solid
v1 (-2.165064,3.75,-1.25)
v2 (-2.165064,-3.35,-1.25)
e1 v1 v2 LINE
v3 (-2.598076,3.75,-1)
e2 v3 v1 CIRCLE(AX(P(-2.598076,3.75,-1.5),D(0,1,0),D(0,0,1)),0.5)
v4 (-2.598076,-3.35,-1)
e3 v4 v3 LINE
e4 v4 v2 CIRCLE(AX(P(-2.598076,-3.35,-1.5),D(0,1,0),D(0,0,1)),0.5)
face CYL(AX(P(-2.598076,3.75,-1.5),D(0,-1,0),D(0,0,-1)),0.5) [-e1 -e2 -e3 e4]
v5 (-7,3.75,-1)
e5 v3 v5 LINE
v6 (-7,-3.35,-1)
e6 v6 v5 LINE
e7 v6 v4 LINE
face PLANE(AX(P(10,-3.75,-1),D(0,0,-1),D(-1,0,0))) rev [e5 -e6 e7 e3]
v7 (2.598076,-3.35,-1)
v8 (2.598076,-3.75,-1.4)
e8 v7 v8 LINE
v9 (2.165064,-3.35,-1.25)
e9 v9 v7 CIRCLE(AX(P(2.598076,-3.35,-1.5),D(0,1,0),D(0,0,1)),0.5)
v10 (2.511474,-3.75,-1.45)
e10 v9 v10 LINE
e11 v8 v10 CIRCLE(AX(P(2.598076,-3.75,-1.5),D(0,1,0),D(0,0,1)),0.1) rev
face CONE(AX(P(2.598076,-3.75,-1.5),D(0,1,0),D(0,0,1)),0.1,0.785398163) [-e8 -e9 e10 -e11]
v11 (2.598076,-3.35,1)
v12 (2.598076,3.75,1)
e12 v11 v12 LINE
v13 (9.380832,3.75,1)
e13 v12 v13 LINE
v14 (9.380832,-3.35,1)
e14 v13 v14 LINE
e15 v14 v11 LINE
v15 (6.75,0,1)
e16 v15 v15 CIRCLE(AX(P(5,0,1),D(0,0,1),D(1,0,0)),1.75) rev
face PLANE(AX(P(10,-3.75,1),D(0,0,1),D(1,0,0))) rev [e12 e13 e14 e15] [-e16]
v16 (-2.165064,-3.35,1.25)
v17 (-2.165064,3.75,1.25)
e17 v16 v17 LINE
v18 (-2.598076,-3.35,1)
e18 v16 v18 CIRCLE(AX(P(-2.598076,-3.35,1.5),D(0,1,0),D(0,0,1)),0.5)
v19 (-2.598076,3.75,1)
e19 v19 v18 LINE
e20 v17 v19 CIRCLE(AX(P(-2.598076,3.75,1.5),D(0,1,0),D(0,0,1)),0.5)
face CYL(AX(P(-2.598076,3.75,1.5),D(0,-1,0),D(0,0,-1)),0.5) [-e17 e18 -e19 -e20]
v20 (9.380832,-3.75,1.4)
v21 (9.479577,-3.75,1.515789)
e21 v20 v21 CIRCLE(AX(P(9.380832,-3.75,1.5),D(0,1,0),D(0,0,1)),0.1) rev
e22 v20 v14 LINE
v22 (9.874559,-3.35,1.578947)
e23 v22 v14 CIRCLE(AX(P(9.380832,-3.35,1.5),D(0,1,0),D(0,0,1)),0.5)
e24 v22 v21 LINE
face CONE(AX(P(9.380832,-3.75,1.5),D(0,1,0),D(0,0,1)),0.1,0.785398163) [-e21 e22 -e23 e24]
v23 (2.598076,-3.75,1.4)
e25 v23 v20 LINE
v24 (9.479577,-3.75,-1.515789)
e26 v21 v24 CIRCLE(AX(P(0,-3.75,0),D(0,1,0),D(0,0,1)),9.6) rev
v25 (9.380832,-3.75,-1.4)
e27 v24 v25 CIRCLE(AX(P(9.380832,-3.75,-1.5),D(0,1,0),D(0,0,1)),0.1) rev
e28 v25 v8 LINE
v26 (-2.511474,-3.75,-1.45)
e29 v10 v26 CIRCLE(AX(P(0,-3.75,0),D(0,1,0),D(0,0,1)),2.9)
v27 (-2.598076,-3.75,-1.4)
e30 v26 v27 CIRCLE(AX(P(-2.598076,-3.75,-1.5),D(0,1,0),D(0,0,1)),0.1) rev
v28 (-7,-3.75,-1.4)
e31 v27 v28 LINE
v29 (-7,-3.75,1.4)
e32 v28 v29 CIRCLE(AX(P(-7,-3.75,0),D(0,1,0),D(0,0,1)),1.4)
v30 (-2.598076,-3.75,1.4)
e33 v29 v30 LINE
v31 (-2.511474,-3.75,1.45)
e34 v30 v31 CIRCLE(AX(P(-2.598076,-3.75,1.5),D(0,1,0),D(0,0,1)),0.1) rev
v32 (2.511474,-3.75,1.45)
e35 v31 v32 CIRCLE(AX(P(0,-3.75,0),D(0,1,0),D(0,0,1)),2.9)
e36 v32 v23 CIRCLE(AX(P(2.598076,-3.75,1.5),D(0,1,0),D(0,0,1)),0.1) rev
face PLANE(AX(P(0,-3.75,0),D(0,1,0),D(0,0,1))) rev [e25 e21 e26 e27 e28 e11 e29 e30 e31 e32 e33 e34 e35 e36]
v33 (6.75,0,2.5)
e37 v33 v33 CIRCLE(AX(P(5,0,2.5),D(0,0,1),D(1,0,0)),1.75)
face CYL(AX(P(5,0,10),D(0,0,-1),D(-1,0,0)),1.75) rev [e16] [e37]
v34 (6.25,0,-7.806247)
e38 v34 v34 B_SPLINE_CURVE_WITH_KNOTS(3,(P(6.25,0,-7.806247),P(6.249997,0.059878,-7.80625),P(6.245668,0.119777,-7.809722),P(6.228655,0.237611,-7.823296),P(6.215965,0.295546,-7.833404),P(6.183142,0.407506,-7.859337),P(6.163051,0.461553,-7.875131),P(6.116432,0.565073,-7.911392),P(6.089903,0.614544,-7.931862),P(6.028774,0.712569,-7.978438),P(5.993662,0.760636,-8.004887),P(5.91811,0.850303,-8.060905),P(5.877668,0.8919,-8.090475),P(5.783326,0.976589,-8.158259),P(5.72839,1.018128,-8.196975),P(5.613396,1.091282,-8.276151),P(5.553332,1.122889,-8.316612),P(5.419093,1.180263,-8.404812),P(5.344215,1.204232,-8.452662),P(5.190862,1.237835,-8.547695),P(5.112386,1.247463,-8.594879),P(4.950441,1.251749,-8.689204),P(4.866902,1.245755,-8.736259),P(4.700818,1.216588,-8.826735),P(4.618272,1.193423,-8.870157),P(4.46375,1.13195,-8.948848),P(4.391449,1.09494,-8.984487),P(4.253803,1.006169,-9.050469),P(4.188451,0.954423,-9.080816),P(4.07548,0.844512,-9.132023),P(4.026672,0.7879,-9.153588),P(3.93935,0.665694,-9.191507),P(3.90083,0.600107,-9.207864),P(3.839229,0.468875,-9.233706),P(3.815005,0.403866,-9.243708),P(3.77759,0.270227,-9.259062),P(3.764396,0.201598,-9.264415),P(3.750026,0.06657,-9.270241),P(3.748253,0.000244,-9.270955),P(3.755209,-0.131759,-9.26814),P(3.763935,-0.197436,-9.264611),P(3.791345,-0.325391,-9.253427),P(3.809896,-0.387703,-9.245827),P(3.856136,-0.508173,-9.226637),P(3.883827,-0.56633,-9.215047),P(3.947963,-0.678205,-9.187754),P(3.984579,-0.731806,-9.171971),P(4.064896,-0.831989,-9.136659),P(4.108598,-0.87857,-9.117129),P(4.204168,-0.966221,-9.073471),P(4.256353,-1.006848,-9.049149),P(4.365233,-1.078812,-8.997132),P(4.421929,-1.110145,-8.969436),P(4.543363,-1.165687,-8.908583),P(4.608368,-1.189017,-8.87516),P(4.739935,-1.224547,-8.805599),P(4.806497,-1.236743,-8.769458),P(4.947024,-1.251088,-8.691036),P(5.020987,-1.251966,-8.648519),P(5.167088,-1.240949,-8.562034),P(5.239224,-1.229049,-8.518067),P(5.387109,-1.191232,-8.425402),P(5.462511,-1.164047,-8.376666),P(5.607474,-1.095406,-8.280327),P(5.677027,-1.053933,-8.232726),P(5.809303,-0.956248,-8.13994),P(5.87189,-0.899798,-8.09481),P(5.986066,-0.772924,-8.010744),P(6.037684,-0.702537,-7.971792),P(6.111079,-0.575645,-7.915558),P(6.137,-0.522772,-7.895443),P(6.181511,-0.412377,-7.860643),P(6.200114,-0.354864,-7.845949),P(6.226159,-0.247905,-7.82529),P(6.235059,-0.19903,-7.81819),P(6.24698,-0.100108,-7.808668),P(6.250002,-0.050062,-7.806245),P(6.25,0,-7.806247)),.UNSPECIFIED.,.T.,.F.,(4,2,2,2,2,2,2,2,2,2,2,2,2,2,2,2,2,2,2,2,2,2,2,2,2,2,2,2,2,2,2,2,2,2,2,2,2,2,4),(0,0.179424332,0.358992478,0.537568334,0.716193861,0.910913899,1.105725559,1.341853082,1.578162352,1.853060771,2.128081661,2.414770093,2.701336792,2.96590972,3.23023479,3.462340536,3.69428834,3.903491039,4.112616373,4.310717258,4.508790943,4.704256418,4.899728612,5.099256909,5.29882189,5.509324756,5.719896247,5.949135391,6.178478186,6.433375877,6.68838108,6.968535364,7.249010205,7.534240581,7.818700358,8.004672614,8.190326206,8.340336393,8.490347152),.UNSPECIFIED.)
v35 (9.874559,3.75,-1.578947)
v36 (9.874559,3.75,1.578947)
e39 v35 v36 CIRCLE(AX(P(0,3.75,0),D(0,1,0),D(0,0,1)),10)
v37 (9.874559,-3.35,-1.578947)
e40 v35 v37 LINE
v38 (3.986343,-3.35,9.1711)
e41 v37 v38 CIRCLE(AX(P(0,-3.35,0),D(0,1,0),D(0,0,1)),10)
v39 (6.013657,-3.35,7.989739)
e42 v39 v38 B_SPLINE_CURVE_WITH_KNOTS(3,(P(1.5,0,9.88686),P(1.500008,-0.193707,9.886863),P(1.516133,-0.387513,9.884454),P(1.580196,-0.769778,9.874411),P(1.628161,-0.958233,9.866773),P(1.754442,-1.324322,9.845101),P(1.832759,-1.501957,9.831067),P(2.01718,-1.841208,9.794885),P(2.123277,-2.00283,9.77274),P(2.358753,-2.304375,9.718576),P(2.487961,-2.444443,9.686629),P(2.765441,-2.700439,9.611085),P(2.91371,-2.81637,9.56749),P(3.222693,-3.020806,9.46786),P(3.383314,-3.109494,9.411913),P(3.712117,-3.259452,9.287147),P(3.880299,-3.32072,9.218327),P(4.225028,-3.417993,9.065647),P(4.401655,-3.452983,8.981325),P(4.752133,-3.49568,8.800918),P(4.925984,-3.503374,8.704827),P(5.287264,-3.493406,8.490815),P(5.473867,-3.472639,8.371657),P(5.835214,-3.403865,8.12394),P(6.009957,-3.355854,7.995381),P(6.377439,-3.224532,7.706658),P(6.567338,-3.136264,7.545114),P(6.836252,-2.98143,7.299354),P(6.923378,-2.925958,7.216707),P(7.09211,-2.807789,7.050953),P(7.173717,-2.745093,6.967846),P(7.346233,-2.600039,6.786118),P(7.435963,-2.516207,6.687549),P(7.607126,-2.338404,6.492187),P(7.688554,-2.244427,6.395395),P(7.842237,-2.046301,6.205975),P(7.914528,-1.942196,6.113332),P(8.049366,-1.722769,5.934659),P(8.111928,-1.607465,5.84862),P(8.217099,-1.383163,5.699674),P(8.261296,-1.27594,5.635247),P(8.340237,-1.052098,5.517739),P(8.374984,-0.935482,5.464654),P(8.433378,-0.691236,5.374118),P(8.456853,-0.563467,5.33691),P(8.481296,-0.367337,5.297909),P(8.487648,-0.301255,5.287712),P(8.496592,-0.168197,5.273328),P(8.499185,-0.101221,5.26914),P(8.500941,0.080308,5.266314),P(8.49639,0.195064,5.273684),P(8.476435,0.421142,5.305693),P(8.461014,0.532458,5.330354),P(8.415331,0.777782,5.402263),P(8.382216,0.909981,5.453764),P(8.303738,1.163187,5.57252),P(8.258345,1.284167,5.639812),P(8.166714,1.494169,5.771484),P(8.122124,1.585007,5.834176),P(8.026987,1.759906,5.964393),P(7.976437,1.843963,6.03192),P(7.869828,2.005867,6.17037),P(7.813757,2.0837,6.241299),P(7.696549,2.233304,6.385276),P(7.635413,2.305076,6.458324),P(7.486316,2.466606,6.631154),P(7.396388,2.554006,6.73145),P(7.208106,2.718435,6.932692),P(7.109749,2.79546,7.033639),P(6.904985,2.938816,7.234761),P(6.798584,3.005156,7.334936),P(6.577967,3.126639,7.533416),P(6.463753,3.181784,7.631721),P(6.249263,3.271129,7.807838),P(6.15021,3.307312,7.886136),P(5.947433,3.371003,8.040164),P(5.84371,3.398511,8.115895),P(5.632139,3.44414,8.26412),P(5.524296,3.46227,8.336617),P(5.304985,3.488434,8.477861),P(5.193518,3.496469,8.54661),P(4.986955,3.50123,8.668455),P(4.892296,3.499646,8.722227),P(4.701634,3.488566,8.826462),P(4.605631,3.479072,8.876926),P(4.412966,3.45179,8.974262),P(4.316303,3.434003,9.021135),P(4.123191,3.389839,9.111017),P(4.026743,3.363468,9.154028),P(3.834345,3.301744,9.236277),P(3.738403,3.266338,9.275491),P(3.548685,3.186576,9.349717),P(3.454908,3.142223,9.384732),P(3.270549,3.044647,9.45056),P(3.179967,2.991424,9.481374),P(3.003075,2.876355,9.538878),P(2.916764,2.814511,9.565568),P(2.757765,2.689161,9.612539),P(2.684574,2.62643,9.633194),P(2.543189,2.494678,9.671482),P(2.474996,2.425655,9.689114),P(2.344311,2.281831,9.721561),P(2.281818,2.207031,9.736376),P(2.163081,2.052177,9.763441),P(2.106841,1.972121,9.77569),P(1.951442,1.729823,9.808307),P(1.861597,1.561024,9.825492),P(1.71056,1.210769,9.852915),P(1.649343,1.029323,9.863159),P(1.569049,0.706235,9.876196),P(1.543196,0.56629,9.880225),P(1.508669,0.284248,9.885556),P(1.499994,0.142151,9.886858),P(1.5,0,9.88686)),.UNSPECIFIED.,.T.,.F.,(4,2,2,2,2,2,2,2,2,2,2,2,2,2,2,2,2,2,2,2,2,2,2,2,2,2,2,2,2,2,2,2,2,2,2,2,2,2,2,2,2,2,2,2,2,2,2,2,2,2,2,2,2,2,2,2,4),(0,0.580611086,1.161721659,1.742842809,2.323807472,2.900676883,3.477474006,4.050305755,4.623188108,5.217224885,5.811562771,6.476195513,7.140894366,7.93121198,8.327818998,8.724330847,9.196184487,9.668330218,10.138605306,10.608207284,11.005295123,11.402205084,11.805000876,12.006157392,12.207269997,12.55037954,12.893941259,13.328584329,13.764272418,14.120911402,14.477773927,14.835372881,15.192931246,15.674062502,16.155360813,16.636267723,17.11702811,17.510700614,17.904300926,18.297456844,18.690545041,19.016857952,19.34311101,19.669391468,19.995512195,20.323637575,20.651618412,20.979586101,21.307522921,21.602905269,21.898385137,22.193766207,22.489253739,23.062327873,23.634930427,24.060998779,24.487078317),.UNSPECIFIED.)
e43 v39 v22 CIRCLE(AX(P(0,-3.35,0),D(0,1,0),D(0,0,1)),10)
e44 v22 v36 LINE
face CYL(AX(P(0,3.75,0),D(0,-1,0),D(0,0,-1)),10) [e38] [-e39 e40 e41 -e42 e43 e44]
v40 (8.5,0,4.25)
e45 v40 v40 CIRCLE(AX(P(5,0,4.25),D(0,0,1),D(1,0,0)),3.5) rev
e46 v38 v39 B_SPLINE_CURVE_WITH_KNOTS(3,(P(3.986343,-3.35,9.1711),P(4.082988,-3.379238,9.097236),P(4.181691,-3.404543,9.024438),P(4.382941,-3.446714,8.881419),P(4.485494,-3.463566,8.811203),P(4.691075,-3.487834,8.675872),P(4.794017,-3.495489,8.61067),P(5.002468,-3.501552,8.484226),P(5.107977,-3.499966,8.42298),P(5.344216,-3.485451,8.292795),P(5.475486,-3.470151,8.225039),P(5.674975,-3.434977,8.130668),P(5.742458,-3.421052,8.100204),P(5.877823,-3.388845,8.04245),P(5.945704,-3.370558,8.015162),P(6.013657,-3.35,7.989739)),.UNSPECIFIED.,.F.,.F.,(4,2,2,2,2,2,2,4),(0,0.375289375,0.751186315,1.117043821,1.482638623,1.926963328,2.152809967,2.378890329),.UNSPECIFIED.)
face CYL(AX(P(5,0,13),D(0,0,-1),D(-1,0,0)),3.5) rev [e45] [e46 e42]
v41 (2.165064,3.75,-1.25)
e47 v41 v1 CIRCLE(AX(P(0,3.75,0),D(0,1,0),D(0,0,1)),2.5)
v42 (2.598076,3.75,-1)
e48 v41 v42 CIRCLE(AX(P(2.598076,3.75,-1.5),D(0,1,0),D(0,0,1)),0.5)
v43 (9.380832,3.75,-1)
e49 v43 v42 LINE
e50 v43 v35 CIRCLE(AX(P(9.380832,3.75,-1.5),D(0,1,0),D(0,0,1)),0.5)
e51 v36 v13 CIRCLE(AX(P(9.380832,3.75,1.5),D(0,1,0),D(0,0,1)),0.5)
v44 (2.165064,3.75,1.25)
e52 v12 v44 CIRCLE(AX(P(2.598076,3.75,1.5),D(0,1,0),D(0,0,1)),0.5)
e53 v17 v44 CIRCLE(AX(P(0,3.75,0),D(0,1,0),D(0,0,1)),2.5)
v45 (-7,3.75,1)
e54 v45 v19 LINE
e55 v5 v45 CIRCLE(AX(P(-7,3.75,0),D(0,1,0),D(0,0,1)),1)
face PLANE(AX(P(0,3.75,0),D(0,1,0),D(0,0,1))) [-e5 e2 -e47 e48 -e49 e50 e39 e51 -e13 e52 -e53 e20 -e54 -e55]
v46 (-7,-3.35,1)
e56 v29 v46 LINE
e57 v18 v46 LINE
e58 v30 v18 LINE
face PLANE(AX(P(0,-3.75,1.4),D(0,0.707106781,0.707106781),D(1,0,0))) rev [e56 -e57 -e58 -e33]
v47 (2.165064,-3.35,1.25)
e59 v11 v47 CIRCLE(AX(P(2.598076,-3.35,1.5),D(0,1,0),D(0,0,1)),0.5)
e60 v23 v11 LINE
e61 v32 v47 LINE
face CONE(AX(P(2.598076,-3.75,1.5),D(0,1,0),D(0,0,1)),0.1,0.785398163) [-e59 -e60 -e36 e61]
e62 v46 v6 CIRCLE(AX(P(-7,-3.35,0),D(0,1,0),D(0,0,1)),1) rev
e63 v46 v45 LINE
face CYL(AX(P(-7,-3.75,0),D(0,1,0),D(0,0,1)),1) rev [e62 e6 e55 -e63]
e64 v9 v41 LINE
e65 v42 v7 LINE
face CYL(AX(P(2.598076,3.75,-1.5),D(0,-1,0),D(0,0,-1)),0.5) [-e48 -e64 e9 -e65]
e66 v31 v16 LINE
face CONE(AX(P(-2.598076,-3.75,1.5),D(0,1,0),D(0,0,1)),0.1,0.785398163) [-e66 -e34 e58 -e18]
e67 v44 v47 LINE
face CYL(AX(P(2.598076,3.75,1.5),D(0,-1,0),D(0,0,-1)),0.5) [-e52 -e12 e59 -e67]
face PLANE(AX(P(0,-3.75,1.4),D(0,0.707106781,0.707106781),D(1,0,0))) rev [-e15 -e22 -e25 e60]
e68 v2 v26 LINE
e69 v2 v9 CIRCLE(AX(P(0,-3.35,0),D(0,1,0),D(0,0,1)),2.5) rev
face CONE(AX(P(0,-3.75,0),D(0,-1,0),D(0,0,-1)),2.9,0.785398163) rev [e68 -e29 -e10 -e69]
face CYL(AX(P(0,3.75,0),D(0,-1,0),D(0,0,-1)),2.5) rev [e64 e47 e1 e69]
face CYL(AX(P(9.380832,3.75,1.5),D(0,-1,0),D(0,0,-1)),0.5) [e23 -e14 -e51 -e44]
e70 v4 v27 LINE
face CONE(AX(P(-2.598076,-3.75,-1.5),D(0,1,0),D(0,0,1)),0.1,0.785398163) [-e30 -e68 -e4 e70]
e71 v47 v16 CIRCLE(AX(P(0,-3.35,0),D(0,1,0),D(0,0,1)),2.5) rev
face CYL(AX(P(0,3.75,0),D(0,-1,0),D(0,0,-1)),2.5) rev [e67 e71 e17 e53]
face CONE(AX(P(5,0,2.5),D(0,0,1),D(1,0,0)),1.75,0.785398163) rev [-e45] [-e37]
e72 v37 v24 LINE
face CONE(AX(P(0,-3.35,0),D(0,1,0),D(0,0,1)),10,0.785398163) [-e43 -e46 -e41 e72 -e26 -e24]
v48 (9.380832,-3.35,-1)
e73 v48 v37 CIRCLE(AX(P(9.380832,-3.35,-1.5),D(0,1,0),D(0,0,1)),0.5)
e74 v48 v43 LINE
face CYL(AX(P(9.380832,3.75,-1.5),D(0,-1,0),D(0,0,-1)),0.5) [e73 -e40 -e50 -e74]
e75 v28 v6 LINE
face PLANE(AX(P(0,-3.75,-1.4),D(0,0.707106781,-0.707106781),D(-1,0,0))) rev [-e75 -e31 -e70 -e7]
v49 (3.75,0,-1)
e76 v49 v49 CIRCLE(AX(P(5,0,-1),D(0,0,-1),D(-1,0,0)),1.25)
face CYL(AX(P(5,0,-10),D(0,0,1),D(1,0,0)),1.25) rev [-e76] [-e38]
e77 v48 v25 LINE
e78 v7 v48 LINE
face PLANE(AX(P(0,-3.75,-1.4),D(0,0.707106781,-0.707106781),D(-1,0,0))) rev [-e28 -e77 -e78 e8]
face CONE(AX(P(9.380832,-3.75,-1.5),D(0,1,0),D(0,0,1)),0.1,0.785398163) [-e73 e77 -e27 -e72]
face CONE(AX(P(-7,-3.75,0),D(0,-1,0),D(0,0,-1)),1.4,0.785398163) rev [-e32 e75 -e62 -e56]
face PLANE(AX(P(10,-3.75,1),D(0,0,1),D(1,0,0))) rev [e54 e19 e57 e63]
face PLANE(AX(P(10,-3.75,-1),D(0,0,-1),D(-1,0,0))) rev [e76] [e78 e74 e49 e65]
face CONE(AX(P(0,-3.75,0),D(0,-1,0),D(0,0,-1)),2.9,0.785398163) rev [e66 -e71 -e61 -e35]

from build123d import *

# Parameters (mm, degrees)
SKETCH1_R               = 10
SKETCH1_R_2             = 2.5
BOSS_EXTRUDE1_DEPTH     = 3.75
CUT_EXTRUDE1_DEPTH      = 17.007810594
CUT_EXTRUDE2_DEPTH      = 16.331748106
CUT_EXTRUDE2_DEPTH_BACK = 16.331748106
SKETCH3_R               = 1.25
SKETCH4_R               = 1.75
CUT_EXTRUDE3_DEPTH      = 16.331748268
CUT_EXTRUDE4_START      = 6
SKETCH5_R               = 3.5
CUT_EXTRUDE4_DEPTH      = 8
CHAMFER1_SIZE           = 2.5
FILLET1_R               = 0.5
CHAMFER2_SIZE           = 0.4


with BuildPart() as part:
    # Sketch1 → Boss-Extrude1 (new, symmetric)
    with BuildSketch(Plane(origin=(0, 0, 0), x_dir=(1, 0, 0), z_dir=(0, 1, 0))):
        with Locations(Location((0, 0, 0), (0, 0, 270))):
            Circle(SKETCH1_R)
        with Locations(Location((0, 0, 0), (0, 0, 270))):
            Circle(SKETCH1_R_2, mode=Mode.SUBTRACT)
    extrude(amount=BOSS_EXTRUDE1_DEPTH, both=True)

    # Sketch2 → Cut-Extrude1 (cut, through all)
    with BuildSketch(Plane(origin=(0, 3.75, 0), x_dir=(1, 0, 0), z_dir=(0, 1, 0))):
        with BuildLine():
            Line((10, -1), (-7, -1))
            ThreePointArc((-7, -1), (-8, 0), (-7, 1))
            Line((-7, 1), (10, 1))
            ThreePointArc((10, 1), (11, 0), (10, -1))
        make_face()
    extrude(amount=-CUT_EXTRUDE1_DEPTH, mode=Mode.SUBTRACT)

    # Sketch3 → Cut-Extrude2 (cut, two sides: drawn at the far end of the back side and taken through both)
    with BuildSketch(Plane.XY.offset(-1).offset(-CUT_EXTRUDE2_DEPTH_BACK)):
        with Locations((5, 0)):
            Circle(SKETCH3_R)
    extrude(amount=CUT_EXTRUDE2_DEPTH + CUT_EXTRUDE2_DEPTH_BACK, mode=Mode.SUBTRACT)

    # Sketch4 → Cut-Extrude3 (cut, through all)
    with BuildSketch(Plane.XY.offset(-1)):
        with Locations(Location((5, 0, 0), (0, 0, 180))):
            Circle(SKETCH4_R)
    extrude(amount=CUT_EXTRUDE3_DEPTH, mode=Mode.SUBTRACT)

    # Sketch5 → Cut-Extrude4 (cut)
    with BuildSketch(Plane.XY.offset(-1).offset(CUT_EXTRUDE4_START)):
        with Locations(Location((5, 0, 0), (0, 0, 180))):
            Circle(SKETCH5_R)
    extrude(amount=CUT_EXTRUDE4_DEPTH, mode=Mode.SUBTRACT)

    # Chamfer1
    # the kernel refuses this chamfer: 2.5 mm, written as the material it takes off along each edge
    with BuildSketch(Plane(origin=(5, 0, 5), x_dir=(-1, 0, 0), z_dir=(0, -1, 0))) as chamfer1_piece_1_section:
        Polygon((1.75, CHAMFER1_SIZE), (1.75 + CHAMFER1_SIZE, 0), (1.75, 0), align=None)
    chamfer1_piece_1 = revolve(axis=Axis((5, 0, 5), (0, 0, -1)), mode=Mode.PRIVATE)
    chamfer1_piece_1 = chamfer1_piece_1 & Plane(origin=(5, 0, 3.399981632), x_dir=(-1, 0, 0), z_dir=(0, 0, -1)) * Cylinder(3.5, 17, mode=Mode.PRIVATE)
    add(chamfer1_piece_1, mode=Mode.SUBTRACT)

    # Fillet1
    fillet1_edges = [part.edges().sort_by_distance(p)[0] for p in [
        (-2.291287847, 0, -1),
        (2.291287847, 0, -1),
        (2.291287847, 0, 1),
        (-2.291287847, 0, 1),
        (9.949874371, 0, 1),
        (9.949874371, 0, -1),
    ]]
    fillet(fillet1_edges, radius=FILLET1_R)

    # Chamfer2
    # the kernel refuses this chamfer: 0.4 mm, written as the material it takes off along each edge
    with BuildSketch(Plane(origin=(9.38083152, -3.75, 1.5), x_dir=(0.9874559494365127, 0, 0.15789473684209784), z_dir=(-0.15789473684209784, 0, 0.9874559494365127))) as chamfer2_piece_1:
        Polygon((0.5, CHAMFER2_SIZE), (0.5 - CHAMFER2_SIZE, 0), (0.5, 0), align=None)
    revolve(axis=Axis((9.38083152, -3.75, 1.5), (0, 1, 0)), revolution_arc=99.084720287, mode=Mode.SUBTRACT)
    with BuildSketch(Plane(origin=(0, -3.75, 0), x_dir=(0.9874559494365116, 0, -0.15789473684210514), z_dir=(0.15789473684210514, 0, 0.9874559494365116))) as chamfer2_piece_2:
        Polygon((10, CHAMFER2_SIZE), (10 - CHAMFER2_SIZE, 0), (10, 0), align=None)
    revolve(axis=Axis((0, -3.75, 0), (0, 1, 0)), revolution_arc=341.830559425, mode=Mode.SUBTRACT)
    with BuildSketch(Plane(origin=(9.38083152, -3.75, 1), x_dir=(0, -0.027495876610586285, 0.9996219169112968), z_dir=(-1, 0, 0)), Plane(origin=(2.598076211, -3.75, -1), x_dir=(0, -0.027495876610586285, -0.9996219169112968), z_dir=(1, 0, 0))) as chamfer2_piece_3:
        Polygon((CHAMFER2_SIZE * 0.999621916911, CHAMFER2_SIZE * 0.0274958766106), (-CHAMFER2_SIZE * 0.0274958766106, CHAMFER2_SIZE * 0.999621916911), (0, 0), align=None)
    extrude(amount=6.782755308, mode=Mode.SUBTRACT)
    with BuildSketch(Plane(origin=(9.38083152, -3.75, -1.5), x_dir=(0.9874559494365118, 0, -0.1578947368421039), z_dir=(-0.1578947368421039, 0, -0.9874559494365118))) as chamfer2_piece_4:
        Polygon((0.5, -CHAMFER2_SIZE), (0.5 - CHAMFER2_SIZE, 0), (0.5, 0), align=None)
    revolve(axis=Axis((9.38083152, -3.75, -1.5), (0, -1, 0)), revolution_arc=99.084720287, mode=Mode.SUBTRACT)
    with BuildSketch(Plane(origin=(2.598076211, -3.75, 1.5), x_dir=(-0.8660254037844399, 0, -0.49999999999999767), z_dir=(-0.49999999999999767, 0, 0.8660254037844399))) as chamfer2_piece_5:
        Polygon((0.5 - CHAMFER2_SIZE, 0), (0.5, -CHAMFER2_SIZE), (0.5, 0), align=None)
    revolve(axis=Axis((2.598076211, -3.75, 1.5), (0, -1, 0)), revolution_arc=60, mode=Mode.SUBTRACT)
    with BuildSketch(Plane(origin=(0, -3.75, 0), x_dir=(-0.8660254037844383, 0, 0.5000000000000007), z_dir=(-0.5000000000000007, 0, -0.8660254037844383))) as chamfer2_piece_6:
        Polygon((2.5 + CHAMFER2_SIZE, 0), (2.5, CHAMFER2_SIZE), (2.5, 0), align=None)
    revolve(axis=Axis((0, -3.75, 0), (0, 1, 0)), revolution_arc=120, mode=Mode.SUBTRACT)
    with BuildSketch(Plane(origin=(2.598076211, -3.75, -1.5), x_dir=(-0.866025403784439, 0, 0.49999999999999944), z_dir=(-0.49999999999999944, 0, -0.866025403784439))) as chamfer2_piece_7:
        Polygon((0.5 - CHAMFER2_SIZE, 0), (0.5, CHAMFER2_SIZE), (0.5, 0), align=None)
    revolve(axis=Axis((2.598076211, -3.75, -1.5), (0, 1, 0)), revolution_arc=60, mode=Mode.SUBTRACT)
    with BuildSketch(Plane(origin=(-2.598076211, -3.75, 1.5), x_dir=(0, 0, -1), z_dir=(-1, 0, 0))) as chamfer2_piece_8:
        Polygon((0.5 - CHAMFER2_SIZE, 0), (0.5, -CHAMFER2_SIZE), (0.5, 0), align=None)
    revolve(axis=Axis((-2.598076211, -3.75, 1.5), (0, -1, 0)), revolution_arc=60, mode=Mode.SUBTRACT)
    with BuildSketch(Plane(origin=(0, -3.75, 0), x_dir=(0.8660254037844389, 0, -0.49999999999999967), z_dir=(0.49999999999999967, 0, 0.8660254037844389))) as chamfer2_piece_9:
        Polygon((2.5 + CHAMFER2_SIZE, 0), (2.5, CHAMFER2_SIZE), (2.5, 0), align=None)
    revolve(axis=Axis((0, -3.75, 0), (0, 1, 0)), revolution_arc=120, mode=Mode.SUBTRACT)
    with BuildSketch(Plane(origin=(-2.598076211, -3.75, 1), x_dir=(0, -0.027495876610586285, 0.9996219169112968), z_dir=(-1, 0, 0)), Plane(origin=(-7, -3.75, -1), x_dir=(0, -0.027495876610586275, -0.9996219169112966), z_dir=(1, 0, 0))) as chamfer2_piece_10:
        Polygon((CHAMFER2_SIZE * 0.999621916911, CHAMFER2_SIZE * 0.0274958766106), (-CHAMFER2_SIZE * 0.0274958766106, CHAMFER2_SIZE * 0.999621916911), (0, 0), align=None)
    extrude(amount=4.401923789, mode=Mode.SUBTRACT)
    with BuildSketch(Plane(origin=(-2.598076211, -3.75, -1.5), x_dir=(0.8660254037844403, 0, 0.4999999999999974), z_dir=(0.4999999999999974, 0, -0.8660254037844403))) as chamfer2_piece_11:
        Polygon((0.5 - CHAMFER2_SIZE, 0), (0.5, -CHAMFER2_SIZE), (0.5, 0), align=None)
    revolve(axis=Axis((-2.598076211, -3.75, -1.5), (0, -1, 0)), revolution_arc=60, mode=Mode.SUBTRACT)
    with BuildSketch(Plane(origin=(-7, -3.75, 0), x_dir=(0, 0, -1), z_dir=(1, 0, 0))) as chamfer2_piece_12:
        Polygon((1 + CHAMFER2_SIZE, 0), (1, CHAMFER2_SIZE), (1, 0), align=None)
    revolve(axis=Axis((-7, -3.75, 0), (0, 1, 0)), revolution_arc=180, mode=Mode.SUBTRACT)


solid = part.part
